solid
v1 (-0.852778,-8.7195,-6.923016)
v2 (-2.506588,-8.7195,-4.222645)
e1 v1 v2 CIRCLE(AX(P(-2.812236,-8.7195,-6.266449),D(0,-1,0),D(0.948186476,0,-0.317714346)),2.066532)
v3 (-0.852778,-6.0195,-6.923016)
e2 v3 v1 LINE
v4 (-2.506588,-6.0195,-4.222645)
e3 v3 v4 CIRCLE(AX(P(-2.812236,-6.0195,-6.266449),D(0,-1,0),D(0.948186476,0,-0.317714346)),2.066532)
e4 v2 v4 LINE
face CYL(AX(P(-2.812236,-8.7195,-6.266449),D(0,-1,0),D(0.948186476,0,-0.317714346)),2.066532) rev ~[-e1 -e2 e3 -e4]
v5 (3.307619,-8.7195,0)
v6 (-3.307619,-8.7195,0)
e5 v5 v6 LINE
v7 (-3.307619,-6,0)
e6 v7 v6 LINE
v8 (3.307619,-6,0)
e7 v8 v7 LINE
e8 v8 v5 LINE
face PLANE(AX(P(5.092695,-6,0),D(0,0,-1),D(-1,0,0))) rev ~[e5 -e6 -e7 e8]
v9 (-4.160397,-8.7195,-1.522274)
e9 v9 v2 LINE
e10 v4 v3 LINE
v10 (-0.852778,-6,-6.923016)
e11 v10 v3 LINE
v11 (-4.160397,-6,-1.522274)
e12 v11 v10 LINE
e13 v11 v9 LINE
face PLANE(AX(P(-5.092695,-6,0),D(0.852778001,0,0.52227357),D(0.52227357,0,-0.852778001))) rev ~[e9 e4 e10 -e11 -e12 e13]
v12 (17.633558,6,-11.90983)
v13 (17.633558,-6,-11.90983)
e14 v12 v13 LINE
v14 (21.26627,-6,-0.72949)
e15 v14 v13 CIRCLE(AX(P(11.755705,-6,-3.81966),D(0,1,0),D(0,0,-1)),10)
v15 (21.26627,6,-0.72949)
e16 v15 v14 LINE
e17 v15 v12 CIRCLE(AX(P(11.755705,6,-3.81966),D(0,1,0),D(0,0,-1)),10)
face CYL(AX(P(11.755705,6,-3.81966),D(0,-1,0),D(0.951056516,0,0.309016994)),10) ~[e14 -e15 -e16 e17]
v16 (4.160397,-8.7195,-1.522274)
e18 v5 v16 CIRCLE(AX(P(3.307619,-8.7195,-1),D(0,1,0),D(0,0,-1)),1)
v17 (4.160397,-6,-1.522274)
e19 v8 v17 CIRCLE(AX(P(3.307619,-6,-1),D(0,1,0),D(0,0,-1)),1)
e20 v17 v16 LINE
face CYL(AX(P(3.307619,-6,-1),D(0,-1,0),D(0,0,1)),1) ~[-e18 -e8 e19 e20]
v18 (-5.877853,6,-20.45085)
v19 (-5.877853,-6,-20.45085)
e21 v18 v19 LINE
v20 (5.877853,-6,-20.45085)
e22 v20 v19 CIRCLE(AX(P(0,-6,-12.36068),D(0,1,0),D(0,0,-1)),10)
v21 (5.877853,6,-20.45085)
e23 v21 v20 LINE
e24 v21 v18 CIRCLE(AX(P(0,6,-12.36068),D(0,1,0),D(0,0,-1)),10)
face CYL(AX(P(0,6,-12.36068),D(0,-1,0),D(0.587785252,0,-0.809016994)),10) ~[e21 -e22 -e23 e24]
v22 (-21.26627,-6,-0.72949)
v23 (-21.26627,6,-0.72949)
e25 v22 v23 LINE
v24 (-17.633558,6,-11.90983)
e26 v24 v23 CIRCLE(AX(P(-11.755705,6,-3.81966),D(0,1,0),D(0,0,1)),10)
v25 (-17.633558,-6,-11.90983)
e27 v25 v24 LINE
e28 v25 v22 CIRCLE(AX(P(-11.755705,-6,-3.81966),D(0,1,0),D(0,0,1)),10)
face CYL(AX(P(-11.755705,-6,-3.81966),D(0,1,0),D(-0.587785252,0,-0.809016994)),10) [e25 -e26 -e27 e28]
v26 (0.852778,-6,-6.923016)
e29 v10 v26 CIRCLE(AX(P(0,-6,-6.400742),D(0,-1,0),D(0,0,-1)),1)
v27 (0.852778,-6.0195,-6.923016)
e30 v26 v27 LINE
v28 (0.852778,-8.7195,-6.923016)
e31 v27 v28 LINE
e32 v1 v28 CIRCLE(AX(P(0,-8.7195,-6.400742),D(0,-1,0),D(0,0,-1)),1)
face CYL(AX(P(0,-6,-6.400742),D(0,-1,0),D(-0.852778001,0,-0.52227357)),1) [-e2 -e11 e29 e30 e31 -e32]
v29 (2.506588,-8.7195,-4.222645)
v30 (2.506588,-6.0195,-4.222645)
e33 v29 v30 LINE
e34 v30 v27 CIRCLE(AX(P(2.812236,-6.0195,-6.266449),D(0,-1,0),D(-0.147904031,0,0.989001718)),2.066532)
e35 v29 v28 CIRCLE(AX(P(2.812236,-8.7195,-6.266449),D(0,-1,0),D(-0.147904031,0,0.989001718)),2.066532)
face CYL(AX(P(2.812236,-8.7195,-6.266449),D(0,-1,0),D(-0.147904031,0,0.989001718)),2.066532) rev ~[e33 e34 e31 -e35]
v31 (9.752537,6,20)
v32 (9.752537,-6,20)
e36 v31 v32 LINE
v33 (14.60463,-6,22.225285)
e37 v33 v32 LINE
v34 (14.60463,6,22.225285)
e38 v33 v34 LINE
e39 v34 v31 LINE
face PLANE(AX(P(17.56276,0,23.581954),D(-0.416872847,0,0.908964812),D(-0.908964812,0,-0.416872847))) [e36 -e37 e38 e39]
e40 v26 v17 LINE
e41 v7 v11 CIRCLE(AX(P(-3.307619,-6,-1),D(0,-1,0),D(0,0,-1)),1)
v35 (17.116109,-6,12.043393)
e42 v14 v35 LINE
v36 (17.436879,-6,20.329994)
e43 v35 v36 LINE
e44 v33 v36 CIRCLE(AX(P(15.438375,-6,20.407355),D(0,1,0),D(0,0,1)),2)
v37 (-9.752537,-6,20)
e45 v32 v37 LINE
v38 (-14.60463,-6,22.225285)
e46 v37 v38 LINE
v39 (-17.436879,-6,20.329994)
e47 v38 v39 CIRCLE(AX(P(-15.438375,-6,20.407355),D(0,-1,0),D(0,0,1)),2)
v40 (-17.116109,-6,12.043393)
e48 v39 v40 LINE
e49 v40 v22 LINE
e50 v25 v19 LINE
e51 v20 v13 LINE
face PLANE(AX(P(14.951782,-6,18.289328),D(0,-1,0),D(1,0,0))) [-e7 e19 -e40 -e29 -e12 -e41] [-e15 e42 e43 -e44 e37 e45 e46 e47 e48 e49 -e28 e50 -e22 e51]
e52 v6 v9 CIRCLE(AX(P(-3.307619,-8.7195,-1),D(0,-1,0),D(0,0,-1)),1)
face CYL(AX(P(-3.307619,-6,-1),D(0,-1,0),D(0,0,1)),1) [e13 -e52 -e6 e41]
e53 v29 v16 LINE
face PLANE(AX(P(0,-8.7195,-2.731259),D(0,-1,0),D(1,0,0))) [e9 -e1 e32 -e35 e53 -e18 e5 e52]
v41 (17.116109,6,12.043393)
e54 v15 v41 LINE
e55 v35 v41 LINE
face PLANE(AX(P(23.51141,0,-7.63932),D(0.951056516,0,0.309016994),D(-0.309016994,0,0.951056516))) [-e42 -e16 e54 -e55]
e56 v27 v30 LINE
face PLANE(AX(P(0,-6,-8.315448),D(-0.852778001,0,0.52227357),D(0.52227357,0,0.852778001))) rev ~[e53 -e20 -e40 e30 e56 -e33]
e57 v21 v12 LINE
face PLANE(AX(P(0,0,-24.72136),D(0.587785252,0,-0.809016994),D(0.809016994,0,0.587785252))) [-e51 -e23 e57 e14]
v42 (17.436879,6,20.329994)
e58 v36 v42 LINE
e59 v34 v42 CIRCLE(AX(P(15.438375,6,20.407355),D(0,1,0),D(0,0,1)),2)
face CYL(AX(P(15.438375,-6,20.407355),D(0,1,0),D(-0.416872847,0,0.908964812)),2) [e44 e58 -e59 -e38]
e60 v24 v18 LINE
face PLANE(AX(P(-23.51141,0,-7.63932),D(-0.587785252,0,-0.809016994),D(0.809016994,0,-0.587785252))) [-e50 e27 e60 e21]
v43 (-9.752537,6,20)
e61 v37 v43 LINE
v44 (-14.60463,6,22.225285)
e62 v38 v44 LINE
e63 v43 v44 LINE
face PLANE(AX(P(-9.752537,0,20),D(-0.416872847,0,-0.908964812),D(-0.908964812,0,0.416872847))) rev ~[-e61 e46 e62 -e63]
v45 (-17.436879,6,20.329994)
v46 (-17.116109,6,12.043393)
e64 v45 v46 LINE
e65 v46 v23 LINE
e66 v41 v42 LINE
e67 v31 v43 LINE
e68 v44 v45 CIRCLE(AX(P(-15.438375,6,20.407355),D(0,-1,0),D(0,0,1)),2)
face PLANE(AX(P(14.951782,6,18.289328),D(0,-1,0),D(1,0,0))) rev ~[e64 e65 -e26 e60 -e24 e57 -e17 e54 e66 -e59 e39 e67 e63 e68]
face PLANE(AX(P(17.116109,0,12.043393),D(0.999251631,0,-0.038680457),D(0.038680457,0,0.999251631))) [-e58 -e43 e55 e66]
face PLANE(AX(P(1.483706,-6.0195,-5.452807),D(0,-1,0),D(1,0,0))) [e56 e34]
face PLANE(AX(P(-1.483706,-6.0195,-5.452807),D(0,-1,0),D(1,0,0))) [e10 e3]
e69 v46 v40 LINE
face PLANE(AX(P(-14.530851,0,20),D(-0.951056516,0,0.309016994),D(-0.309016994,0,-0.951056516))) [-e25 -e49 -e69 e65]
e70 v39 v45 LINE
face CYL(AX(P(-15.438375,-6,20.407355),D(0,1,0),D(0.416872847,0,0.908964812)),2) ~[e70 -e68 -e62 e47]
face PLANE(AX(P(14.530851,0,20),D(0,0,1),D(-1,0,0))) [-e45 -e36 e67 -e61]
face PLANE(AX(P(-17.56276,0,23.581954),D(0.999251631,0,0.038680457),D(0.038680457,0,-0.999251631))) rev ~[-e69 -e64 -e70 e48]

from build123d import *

# Parameters (mm, degrees)
F1_DEPTH  = 6
F3_DEPTH  = 6
F5_R      = 2
F6_R      = 10
F9_DEPTH  = 2.7195
F10_R     = 1
F18_DEPTH = 2.7


# Not quite as in the source:
# - the program builds the solid bodies; features that only make, move or delete a surface that nothing else refers to are left out


with BuildPart() as f1:
    # F0 (on Front) → F1 (new body, symmetric)
    with BuildSketch(Plane.XZ):
        Polygon((-23.5114100917, -7.639320225), (0, -24.72135955), (23.5114100917, -7.639320225), (14.5308505601, 20), (-14.5308505601, 20), align=None)
    extrude(amount=F1_DEPTH, both=True)

    # F2 (on Front) → F3 (join, symmetric)
    with BuildSketch(Plane.XZ):
        Polygon((-17.5627600402, 23.5819537193), (-17.116108973, 12.0433927434), (-9.7525370519, 20), align=None)
        Polygon((17.5627600402, 23.5819537193), (9.7525370519, 20), (17.116108973, 12.0433927434), align=None)
    extrude(amount=F3_DEPTH, both=True)

    # F5
    f5_edges = [f1.edges().sort_by_distance(p)[0] for p in [
        (-17.56276, 0, 23.581954),
        (17.56276, 0, 23.581954),
    ]]
    fillet(f5_edges, radius=F5_R)

    # F6
    f6_edges = [f1.edges().sort_by_distance(p)[0] for p in [
        (-23.51141, 0, -7.63932),
        (23.51141, 0, -7.63932),
        (0, 0, -24.72136),
    ]]
    fillet(f6_edges, radius=F6_R)

    # F8 (on face) → F9 (join)
    with BuildSketch(Plane.XZ.offset(6)):
        Polygon((5.0926953554, 0), (-5.0926953554, 0), (0, -8.3154477179), align=None)
    extrude(amount=F9_DEPTH)

    # F10
    f10_edges = [f1.edges().sort_by_distance(p)[0] for p in [
        (0, -7.35975, -8.315448),
        (-5.092695, -7.35975, 0),
        (5.092695, -7.35975, 0),
    ]]
    fillet(f10_edges, radius=F10_R)

    # F17 (on face) → F18 (cut)
    with BuildSketch(Plane.XZ.offset(8.7195)):
        with BuildLine():
            Line((0.8527780007, -6.9230159338), (2.5065876623, -4.2226447518))
            ThreePointArc((2.5065876623, -4.2226447518), (1.0499427142, -5.1871536265), (0.8527780007, -6.9230159338))
        make_face()
        with BuildLine():
            Line((-2.5065876623, -4.2226447518), (-0.8527780007, -6.9230159338))
            ThreePointArc((-0.8527780007, -6.9230159338), (-1.0499427142, -5.1871536265), (-2.5065876623, -4.2226447518))
        make_face()
    extrude(amount=-F18_DEPTH, mode=Mode.SUBTRACT)


solid = f1.part
